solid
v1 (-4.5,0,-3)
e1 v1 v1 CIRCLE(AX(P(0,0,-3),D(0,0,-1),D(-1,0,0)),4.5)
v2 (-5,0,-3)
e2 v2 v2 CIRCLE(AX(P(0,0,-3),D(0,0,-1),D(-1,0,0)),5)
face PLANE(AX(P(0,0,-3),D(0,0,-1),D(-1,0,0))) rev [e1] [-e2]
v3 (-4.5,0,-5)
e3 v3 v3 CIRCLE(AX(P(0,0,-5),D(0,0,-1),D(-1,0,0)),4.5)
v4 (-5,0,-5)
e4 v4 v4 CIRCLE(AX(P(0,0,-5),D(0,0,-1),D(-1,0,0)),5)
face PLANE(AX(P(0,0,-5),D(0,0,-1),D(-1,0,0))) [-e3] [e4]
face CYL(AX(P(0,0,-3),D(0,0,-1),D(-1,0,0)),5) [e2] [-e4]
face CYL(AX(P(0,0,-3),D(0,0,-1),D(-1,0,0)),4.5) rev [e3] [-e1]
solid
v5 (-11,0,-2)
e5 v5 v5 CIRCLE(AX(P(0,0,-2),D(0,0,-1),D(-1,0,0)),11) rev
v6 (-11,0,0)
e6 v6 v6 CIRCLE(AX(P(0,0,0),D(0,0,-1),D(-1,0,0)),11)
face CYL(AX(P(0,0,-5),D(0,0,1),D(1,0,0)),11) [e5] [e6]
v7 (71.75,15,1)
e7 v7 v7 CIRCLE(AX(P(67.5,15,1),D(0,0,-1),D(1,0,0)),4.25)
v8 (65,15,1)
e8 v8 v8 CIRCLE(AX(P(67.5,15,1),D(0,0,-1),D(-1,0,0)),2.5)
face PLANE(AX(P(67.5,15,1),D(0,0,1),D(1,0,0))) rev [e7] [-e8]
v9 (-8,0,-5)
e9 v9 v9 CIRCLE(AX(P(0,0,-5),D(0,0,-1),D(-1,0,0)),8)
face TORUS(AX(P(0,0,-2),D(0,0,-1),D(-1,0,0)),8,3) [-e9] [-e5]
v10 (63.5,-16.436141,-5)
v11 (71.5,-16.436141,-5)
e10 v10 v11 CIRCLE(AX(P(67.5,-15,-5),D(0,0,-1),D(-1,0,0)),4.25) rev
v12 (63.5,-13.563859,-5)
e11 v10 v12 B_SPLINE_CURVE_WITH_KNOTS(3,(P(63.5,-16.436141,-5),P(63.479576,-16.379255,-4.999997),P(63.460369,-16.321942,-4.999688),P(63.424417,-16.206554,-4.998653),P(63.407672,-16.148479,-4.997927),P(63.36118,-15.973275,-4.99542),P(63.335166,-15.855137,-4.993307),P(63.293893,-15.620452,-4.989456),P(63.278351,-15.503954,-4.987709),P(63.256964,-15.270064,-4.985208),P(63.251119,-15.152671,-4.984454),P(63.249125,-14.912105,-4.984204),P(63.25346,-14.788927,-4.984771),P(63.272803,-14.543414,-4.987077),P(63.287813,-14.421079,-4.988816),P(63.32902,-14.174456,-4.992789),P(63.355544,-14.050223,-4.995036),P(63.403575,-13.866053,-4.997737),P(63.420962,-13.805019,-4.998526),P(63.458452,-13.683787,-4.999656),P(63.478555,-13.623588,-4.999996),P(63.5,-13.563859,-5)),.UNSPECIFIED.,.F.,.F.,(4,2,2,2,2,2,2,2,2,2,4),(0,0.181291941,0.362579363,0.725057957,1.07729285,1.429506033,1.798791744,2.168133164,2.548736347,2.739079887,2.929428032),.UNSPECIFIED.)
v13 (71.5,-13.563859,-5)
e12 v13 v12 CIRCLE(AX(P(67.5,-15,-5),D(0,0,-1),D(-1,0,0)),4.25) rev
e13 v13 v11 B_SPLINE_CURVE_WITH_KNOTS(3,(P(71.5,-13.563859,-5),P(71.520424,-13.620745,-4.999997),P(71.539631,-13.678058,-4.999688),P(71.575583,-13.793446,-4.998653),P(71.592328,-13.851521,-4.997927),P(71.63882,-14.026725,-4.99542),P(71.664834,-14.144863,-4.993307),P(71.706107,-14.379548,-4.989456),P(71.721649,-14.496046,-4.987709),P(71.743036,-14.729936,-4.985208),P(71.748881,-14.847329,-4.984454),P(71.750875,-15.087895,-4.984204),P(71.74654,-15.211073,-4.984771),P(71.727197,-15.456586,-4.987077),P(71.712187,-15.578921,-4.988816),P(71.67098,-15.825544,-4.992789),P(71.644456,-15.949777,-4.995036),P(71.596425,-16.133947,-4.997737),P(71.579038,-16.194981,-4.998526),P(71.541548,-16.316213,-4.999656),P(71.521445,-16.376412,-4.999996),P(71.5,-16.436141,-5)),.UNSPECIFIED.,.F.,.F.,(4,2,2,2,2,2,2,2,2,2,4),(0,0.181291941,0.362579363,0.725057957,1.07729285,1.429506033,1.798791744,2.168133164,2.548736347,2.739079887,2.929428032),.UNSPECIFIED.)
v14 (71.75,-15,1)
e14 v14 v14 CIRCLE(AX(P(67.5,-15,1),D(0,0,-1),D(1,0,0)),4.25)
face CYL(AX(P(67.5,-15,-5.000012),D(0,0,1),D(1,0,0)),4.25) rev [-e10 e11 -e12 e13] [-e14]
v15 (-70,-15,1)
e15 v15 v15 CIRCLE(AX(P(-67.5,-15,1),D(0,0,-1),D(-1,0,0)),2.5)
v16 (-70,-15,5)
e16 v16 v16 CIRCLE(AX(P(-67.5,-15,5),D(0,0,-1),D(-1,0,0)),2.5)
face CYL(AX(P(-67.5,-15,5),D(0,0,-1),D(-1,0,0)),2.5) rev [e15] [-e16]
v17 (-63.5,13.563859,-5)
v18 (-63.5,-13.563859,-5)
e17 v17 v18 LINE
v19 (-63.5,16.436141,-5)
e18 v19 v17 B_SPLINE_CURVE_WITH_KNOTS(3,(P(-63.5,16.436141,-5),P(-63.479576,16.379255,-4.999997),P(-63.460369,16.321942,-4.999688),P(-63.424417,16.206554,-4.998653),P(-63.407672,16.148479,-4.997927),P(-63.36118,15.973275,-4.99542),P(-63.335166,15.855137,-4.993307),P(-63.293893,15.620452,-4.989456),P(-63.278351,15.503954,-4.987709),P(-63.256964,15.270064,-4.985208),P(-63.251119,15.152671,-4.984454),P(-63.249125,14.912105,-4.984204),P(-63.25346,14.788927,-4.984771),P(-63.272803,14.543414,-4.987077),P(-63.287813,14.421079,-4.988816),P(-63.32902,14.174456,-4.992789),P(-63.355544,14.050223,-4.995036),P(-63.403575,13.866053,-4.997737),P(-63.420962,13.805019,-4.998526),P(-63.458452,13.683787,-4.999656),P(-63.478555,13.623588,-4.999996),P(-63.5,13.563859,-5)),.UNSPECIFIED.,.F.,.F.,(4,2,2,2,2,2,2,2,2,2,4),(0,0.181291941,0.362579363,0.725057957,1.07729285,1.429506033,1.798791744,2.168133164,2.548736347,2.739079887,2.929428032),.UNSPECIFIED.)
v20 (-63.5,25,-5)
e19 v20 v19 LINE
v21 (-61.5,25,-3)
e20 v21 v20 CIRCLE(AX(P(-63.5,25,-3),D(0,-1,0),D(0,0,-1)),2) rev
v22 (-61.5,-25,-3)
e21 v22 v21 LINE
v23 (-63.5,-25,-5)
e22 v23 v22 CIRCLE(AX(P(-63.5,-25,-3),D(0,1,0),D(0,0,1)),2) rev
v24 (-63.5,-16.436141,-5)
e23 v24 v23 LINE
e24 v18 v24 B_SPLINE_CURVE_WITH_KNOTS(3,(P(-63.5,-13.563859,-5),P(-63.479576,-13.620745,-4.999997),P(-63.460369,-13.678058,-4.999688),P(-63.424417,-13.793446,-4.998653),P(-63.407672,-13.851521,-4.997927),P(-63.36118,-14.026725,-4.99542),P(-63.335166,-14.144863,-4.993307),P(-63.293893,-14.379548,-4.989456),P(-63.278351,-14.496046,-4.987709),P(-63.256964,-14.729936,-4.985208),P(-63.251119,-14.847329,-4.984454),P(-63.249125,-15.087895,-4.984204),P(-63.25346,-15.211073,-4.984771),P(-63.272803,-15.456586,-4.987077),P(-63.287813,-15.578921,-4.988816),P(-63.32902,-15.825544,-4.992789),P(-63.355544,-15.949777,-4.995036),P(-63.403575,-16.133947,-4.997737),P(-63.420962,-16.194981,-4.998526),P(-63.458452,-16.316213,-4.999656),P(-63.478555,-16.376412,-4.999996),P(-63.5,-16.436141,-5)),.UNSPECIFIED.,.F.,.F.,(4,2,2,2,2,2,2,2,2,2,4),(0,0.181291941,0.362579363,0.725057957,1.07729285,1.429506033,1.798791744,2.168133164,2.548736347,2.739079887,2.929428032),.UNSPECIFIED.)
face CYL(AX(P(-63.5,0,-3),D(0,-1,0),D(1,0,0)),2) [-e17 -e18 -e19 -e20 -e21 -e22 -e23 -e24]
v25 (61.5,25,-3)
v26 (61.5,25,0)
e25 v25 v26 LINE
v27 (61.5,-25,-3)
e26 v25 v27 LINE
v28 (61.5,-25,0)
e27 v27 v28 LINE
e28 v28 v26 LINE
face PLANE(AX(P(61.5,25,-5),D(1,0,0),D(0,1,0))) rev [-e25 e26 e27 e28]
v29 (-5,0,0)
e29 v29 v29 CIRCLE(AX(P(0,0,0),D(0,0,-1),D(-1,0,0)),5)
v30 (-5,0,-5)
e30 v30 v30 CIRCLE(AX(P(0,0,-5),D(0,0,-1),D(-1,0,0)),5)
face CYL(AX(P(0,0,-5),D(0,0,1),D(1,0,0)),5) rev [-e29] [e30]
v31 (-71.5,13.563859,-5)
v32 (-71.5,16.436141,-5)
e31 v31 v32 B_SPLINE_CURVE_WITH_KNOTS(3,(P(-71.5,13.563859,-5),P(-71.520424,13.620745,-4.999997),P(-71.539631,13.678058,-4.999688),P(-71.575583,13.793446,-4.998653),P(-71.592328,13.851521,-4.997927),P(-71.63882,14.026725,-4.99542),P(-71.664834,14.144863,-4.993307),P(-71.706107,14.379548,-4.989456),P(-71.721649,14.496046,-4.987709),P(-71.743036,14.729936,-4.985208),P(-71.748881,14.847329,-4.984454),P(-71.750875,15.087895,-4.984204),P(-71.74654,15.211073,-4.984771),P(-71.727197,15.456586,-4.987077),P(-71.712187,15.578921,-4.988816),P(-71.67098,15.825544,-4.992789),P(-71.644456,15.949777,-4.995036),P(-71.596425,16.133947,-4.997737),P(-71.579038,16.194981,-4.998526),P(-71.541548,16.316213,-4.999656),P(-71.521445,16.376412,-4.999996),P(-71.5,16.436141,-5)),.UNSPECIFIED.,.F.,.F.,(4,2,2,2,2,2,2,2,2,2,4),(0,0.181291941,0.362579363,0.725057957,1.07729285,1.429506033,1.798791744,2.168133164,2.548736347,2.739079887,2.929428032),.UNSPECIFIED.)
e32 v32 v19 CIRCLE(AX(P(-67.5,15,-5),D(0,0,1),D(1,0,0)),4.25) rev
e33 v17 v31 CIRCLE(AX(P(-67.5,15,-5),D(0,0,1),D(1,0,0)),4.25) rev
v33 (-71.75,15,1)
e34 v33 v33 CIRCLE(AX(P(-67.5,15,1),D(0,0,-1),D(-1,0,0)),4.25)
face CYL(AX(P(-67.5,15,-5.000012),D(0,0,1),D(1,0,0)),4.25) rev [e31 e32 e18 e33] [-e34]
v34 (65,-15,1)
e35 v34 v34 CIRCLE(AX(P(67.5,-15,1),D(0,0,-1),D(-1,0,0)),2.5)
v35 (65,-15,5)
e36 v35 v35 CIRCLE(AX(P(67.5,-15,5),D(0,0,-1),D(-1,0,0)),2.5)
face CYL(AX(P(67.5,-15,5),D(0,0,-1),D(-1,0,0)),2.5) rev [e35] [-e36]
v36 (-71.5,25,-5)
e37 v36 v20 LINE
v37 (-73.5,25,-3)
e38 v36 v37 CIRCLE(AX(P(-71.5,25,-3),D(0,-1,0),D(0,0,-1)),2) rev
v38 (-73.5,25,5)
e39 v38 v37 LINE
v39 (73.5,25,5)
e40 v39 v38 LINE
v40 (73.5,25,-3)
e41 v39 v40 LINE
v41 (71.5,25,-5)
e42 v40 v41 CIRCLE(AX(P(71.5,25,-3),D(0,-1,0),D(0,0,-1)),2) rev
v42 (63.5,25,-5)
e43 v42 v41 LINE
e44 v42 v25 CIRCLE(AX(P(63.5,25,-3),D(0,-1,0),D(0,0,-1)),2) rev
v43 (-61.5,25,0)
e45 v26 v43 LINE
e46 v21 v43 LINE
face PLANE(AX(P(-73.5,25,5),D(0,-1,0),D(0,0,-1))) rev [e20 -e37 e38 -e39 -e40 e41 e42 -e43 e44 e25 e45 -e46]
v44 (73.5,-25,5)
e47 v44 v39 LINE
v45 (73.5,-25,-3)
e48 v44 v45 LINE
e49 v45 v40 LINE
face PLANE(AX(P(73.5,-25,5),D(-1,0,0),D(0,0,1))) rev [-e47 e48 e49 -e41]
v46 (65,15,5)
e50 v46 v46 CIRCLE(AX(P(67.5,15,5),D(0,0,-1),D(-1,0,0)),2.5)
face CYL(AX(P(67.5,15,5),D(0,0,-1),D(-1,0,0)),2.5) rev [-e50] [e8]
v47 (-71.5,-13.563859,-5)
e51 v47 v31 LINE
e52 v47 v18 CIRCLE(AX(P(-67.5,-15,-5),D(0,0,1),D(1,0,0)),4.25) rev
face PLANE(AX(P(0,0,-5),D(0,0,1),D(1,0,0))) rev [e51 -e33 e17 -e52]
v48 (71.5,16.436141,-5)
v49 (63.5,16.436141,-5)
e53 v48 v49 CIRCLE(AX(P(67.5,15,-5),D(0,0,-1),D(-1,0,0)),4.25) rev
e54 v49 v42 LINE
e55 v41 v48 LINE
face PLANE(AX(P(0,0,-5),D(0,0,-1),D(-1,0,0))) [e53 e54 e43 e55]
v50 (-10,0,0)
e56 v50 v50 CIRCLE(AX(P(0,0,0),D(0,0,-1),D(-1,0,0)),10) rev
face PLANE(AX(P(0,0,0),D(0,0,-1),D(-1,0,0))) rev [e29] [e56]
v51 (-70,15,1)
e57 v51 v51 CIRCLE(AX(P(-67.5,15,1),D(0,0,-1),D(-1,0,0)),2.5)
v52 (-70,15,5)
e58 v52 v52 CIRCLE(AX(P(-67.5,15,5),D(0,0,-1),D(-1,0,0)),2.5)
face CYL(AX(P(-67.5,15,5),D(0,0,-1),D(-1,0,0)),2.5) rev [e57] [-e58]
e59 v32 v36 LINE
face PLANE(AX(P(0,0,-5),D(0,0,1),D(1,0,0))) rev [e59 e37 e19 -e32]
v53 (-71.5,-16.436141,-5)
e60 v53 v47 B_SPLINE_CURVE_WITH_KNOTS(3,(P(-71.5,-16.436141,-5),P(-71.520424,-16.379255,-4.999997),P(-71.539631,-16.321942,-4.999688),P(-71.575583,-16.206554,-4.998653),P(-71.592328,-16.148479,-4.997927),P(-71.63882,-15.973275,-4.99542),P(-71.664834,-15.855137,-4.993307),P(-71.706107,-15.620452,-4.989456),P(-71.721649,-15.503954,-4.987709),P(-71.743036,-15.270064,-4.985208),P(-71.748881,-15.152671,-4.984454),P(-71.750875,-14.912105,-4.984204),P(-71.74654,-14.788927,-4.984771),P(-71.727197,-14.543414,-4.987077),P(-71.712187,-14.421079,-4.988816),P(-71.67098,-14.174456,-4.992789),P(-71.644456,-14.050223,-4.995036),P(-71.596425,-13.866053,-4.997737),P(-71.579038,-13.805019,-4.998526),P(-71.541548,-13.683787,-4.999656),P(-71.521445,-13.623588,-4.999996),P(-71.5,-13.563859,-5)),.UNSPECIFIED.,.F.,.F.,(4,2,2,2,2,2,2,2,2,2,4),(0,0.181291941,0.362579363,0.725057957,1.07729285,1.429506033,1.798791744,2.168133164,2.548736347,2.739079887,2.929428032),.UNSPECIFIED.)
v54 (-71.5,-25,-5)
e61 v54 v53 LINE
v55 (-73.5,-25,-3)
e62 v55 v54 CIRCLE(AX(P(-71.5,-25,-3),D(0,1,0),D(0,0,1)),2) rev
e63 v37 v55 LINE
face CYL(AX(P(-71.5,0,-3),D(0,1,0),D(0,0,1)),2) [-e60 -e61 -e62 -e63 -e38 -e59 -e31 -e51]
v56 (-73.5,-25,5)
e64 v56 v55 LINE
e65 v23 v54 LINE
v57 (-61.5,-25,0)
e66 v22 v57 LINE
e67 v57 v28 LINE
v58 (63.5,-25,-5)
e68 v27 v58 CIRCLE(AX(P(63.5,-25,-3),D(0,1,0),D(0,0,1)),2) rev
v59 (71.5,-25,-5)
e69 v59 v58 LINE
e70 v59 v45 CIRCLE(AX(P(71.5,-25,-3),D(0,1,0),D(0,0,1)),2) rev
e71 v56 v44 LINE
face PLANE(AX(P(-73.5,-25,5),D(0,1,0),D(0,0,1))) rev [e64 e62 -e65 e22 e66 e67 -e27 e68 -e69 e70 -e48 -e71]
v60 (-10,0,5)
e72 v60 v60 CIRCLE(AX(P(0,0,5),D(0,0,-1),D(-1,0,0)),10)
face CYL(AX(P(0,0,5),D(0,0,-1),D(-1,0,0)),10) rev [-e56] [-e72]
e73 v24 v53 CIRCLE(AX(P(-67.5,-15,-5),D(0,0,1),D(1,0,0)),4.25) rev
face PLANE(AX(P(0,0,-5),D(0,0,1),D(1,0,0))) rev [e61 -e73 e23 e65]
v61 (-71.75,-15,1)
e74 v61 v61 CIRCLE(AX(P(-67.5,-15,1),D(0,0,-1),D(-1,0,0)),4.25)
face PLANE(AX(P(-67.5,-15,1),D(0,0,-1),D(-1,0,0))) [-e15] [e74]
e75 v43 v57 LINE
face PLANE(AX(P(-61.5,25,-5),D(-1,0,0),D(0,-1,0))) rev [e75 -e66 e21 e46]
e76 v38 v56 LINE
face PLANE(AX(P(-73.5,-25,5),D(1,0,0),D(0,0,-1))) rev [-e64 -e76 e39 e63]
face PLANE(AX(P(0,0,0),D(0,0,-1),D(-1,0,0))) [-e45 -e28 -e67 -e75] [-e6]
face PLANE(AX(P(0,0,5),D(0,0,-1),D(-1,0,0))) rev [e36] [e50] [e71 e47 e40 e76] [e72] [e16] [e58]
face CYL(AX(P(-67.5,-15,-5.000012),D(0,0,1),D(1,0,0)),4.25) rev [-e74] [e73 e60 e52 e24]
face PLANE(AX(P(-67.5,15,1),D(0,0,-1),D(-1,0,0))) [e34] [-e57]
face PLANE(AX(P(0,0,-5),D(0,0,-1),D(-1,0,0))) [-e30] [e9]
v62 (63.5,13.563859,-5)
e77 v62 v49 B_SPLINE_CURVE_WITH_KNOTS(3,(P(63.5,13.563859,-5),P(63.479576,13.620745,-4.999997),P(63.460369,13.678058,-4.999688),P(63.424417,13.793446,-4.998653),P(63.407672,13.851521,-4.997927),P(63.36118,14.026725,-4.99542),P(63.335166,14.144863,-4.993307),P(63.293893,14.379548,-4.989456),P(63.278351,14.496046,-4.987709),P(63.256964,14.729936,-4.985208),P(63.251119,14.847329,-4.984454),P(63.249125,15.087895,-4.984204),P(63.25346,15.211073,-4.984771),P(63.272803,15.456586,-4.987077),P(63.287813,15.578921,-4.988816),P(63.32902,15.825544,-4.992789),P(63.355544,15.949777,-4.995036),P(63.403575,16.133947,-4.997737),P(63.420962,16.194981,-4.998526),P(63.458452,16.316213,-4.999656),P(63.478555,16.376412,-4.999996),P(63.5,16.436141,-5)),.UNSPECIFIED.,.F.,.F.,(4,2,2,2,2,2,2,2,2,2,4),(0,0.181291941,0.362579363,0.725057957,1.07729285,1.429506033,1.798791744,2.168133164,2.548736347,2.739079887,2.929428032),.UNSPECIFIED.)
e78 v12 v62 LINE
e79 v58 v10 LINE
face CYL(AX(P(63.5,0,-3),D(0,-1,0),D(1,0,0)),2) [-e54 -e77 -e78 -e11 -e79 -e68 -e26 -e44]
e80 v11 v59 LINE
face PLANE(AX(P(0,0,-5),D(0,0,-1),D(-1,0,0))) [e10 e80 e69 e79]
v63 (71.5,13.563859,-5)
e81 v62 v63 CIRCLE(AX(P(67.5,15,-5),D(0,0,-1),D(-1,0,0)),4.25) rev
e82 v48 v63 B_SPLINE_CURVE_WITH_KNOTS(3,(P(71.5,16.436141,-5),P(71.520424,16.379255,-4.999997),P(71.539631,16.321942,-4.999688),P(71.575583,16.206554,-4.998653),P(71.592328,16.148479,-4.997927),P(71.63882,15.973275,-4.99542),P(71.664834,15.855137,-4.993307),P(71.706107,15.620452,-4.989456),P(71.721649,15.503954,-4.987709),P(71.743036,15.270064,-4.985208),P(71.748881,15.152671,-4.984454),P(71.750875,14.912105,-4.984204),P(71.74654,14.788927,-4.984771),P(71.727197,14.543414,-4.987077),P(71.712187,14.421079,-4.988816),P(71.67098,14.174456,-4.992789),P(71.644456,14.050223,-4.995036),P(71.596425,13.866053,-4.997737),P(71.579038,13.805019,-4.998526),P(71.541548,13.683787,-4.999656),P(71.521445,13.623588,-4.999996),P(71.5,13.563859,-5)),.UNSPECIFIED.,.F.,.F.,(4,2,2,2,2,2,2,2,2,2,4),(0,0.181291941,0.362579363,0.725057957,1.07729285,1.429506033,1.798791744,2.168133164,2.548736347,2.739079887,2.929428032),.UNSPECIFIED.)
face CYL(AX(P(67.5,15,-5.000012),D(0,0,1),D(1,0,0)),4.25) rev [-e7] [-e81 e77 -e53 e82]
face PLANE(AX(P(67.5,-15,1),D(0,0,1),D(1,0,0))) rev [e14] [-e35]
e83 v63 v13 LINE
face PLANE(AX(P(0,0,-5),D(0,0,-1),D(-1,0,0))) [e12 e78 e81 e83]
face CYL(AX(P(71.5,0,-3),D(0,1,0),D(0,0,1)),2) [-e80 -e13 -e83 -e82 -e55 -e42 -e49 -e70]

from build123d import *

# Parameters (mm, degrees)
CROQUIS1_W                 = 147
CROQUIS1_H                 = 50
SALIENTE_EXTRUIR1_DEPTH    = 5
CORTAR_EXTRUIR1_DEPTH      = 78.796208134
CORTAR_EXTRUIR1_DEPTH_BACK = 78.796208134
CROQUIS2_R                 = 10
CROQUIS3_R                 = 11
CROQUIS3_R_2               = 5
SALIENTE_EXTRUIR2_DEPTH    = 5
REDONDEO1_R                = 3
CROQUIS4_R                 = 5
CROQUIS4_R_2               = 4.5
SALIENTE_EXTRUIR3_DEPTH    = 2
CROQUIS5_W                 = 12
CROQUIS5_H                 = 50
SALIENTE_EXTRUIR4_DEPTH    = 5
CORTAR_EXTRUIR2_DEPTH      = 79.276752615
CORTAR_EXTRUIR2_DEPTH_BACK = 6
CROQUIS6_R                 = 4.25
CROQUIS7_R                 = 2.5
CORTAR_EXTRUIR3_DEPTH      = 78.866873573
REDONDEO2_R                = 2


with BuildPart() as part:
    # Croquis1 → Saliente-Extruir1 (new body)
    with BuildSketch(Plane.XY):
        Rectangle(CROQUIS1_W, CROQUIS1_H)
    extrude(amount=SALIENTE_EXTRUIR1_DEPTH)

    # Croquis2 → Cortar-Extruir1 (cut, two sides: drawn at the far end of the back side and taken through both)
    with BuildSketch(Plane(origin=(0, 0, 0), x_dir=(-1, 0, 0), z_dir=(0, 0, -1)).offset(-CORTAR_EXTRUIR1_DEPTH_BACK)):
        Circle(CROQUIS2_R)
    extrude(amount=CORTAR_EXTRUIR1_DEPTH + CORTAR_EXTRUIR1_DEPTH_BACK, mode=Mode.SUBTRACT)

    # Croquis3 → Saliente-Extruir2 (add)
    with BuildSketch(Plane(origin=(0, 0, 0), x_dir=(-1, 0, 0), z_dir=(0, 0, -1))):
        Circle(CROQUIS3_R)
        Circle(CROQUIS3_R_2, mode=Mode.SUBTRACT)
    extrude(amount=SALIENTE_EXTRUIR2_DEPTH)

    # Redondeo1
    redondeo1_edges = [part.edges().sort_by_distance(p)[0] for p in [
        (11, 0, -5),
    ]]
    fillet(redondeo1_edges, radius=REDONDEO1_R)

    # Croquis5 → Saliente-Extruir4 (add)
    with BuildSketch(Plane(origin=(0, 0, 0), x_dir=(-1, 0, 0), z_dir=(0, 0, -1))):
        with Locations((-67.5, 0)):
            Rectangle(CROQUIS5_W, CROQUIS5_H)
        with Locations((67.5, 0)):
            Rectangle(CROQUIS5_W, CROQUIS5_H)
    extrude(amount=SALIENTE_EXTRUIR4_DEPTH)

    # Croquis6 → Cortar-Extruir2 (cut, two sides: drawn at the far end of the back side and taken through both)
    with BuildSketch(Plane(origin=(0, 0, -5), x_dir=(-1, 0, 0), z_dir=(0, 0, -1)).offset(-CORTAR_EXTRUIR2_DEPTH_BACK)):
        with Locations(Location((67.5, 15, 0), (0, 0, 180))):
            Circle(CROQUIS6_R)
        with Locations(Location((67.5, -15, 0), (0, 0, 180))):
            Circle(CROQUIS6_R)
        with Locations(Location((-67.5, -15, 0), (0, 0, 180))):
            Circle(CROQUIS6_R)
        with Locations(Location((-67.5, 15, 0), (0, 0, 180))):
            Circle(CROQUIS6_R)
    extrude(amount=CORTAR_EXTRUIR2_DEPTH + CORTAR_EXTRUIR2_DEPTH_BACK, mode=Mode.SUBTRACT)

    # Croquis7 → Cortar-Extruir3 (cut, through all)
    with BuildSketch(Plane(origin=(0, 0, 1), x_dir=(-1, 0, 0), z_dir=(0, 0, -1))):
        with Locations((-67.5, 15)):
            Circle(CROQUIS7_R)
        with Locations((67.5, 15)):
            Circle(CROQUIS7_R)
        with Locations((67.5, -15)):
            Circle(CROQUIS7_R)
        with Locations((-67.5, -15)):
            Circle(CROQUIS7_R)
    extrude(amount=-CORTAR_EXTRUIR3_DEPTH, mode=Mode.SUBTRACT)

    # Redondeo2
    # the kernel refuses this fillet: 2 mm, written as the material it takes off along each edge
    with BuildSketch(Plane(origin=(73.5, -30, -5), x_dir=(0, 0, 1), z_dir=(0, 1, 0)), Plane(origin=(61.5, 30, -5), x_dir=(0, 0, 1), z_dir=(0, -1, 0)), Plane(origin=(-61.5, -30, -5), x_dir=(0, 0, 1), z_dir=(0, 1, 0))) as redondeo2_piece_1:
        with BuildLine():
            CenterArc((REDONDEO2_R, -REDONDEO2_R), REDONDEO2_R, 90, 90)
            Line((0, -REDONDEO2_R), (0, 0))
            Line((0, 0), (REDONDEO2_R, 0))
        make_face()
    extrude(amount=60, mode=Mode.SUBTRACT)
    with BuildSketch(Plane(origin=(-73.5, 30, -5), x_dir=(1, 0, 0), z_dir=(0, -1, 0))) as redondeo2_piece_2:
        with BuildLine():
            CenterArc((REDONDEO2_R, REDONDEO2_R), REDONDEO2_R, 180, 90)
            Line((0, REDONDEO2_R), (0, 0))
            Line((0, 0), (REDONDEO2_R, 0))
        make_face()
    extrude(amount=60, mode=Mode.SUBTRACT)


with BuildPart() as body_2:
    # Croquis4 → Saliente-Extruir3 (new body)
    with BuildSketch(Plane(origin=(0, 0, -5), x_dir=(-1, 0, 0), z_dir=(0, 0, -1))):
        Circle(CROQUIS4_R)
        Circle(CROQUIS4_R_2, mode=Mode.SUBTRACT)
    extrude(amount=-SALIENTE_EXTRUIR3_DEPTH)


solid = Compound([part.part, body_2.part])
